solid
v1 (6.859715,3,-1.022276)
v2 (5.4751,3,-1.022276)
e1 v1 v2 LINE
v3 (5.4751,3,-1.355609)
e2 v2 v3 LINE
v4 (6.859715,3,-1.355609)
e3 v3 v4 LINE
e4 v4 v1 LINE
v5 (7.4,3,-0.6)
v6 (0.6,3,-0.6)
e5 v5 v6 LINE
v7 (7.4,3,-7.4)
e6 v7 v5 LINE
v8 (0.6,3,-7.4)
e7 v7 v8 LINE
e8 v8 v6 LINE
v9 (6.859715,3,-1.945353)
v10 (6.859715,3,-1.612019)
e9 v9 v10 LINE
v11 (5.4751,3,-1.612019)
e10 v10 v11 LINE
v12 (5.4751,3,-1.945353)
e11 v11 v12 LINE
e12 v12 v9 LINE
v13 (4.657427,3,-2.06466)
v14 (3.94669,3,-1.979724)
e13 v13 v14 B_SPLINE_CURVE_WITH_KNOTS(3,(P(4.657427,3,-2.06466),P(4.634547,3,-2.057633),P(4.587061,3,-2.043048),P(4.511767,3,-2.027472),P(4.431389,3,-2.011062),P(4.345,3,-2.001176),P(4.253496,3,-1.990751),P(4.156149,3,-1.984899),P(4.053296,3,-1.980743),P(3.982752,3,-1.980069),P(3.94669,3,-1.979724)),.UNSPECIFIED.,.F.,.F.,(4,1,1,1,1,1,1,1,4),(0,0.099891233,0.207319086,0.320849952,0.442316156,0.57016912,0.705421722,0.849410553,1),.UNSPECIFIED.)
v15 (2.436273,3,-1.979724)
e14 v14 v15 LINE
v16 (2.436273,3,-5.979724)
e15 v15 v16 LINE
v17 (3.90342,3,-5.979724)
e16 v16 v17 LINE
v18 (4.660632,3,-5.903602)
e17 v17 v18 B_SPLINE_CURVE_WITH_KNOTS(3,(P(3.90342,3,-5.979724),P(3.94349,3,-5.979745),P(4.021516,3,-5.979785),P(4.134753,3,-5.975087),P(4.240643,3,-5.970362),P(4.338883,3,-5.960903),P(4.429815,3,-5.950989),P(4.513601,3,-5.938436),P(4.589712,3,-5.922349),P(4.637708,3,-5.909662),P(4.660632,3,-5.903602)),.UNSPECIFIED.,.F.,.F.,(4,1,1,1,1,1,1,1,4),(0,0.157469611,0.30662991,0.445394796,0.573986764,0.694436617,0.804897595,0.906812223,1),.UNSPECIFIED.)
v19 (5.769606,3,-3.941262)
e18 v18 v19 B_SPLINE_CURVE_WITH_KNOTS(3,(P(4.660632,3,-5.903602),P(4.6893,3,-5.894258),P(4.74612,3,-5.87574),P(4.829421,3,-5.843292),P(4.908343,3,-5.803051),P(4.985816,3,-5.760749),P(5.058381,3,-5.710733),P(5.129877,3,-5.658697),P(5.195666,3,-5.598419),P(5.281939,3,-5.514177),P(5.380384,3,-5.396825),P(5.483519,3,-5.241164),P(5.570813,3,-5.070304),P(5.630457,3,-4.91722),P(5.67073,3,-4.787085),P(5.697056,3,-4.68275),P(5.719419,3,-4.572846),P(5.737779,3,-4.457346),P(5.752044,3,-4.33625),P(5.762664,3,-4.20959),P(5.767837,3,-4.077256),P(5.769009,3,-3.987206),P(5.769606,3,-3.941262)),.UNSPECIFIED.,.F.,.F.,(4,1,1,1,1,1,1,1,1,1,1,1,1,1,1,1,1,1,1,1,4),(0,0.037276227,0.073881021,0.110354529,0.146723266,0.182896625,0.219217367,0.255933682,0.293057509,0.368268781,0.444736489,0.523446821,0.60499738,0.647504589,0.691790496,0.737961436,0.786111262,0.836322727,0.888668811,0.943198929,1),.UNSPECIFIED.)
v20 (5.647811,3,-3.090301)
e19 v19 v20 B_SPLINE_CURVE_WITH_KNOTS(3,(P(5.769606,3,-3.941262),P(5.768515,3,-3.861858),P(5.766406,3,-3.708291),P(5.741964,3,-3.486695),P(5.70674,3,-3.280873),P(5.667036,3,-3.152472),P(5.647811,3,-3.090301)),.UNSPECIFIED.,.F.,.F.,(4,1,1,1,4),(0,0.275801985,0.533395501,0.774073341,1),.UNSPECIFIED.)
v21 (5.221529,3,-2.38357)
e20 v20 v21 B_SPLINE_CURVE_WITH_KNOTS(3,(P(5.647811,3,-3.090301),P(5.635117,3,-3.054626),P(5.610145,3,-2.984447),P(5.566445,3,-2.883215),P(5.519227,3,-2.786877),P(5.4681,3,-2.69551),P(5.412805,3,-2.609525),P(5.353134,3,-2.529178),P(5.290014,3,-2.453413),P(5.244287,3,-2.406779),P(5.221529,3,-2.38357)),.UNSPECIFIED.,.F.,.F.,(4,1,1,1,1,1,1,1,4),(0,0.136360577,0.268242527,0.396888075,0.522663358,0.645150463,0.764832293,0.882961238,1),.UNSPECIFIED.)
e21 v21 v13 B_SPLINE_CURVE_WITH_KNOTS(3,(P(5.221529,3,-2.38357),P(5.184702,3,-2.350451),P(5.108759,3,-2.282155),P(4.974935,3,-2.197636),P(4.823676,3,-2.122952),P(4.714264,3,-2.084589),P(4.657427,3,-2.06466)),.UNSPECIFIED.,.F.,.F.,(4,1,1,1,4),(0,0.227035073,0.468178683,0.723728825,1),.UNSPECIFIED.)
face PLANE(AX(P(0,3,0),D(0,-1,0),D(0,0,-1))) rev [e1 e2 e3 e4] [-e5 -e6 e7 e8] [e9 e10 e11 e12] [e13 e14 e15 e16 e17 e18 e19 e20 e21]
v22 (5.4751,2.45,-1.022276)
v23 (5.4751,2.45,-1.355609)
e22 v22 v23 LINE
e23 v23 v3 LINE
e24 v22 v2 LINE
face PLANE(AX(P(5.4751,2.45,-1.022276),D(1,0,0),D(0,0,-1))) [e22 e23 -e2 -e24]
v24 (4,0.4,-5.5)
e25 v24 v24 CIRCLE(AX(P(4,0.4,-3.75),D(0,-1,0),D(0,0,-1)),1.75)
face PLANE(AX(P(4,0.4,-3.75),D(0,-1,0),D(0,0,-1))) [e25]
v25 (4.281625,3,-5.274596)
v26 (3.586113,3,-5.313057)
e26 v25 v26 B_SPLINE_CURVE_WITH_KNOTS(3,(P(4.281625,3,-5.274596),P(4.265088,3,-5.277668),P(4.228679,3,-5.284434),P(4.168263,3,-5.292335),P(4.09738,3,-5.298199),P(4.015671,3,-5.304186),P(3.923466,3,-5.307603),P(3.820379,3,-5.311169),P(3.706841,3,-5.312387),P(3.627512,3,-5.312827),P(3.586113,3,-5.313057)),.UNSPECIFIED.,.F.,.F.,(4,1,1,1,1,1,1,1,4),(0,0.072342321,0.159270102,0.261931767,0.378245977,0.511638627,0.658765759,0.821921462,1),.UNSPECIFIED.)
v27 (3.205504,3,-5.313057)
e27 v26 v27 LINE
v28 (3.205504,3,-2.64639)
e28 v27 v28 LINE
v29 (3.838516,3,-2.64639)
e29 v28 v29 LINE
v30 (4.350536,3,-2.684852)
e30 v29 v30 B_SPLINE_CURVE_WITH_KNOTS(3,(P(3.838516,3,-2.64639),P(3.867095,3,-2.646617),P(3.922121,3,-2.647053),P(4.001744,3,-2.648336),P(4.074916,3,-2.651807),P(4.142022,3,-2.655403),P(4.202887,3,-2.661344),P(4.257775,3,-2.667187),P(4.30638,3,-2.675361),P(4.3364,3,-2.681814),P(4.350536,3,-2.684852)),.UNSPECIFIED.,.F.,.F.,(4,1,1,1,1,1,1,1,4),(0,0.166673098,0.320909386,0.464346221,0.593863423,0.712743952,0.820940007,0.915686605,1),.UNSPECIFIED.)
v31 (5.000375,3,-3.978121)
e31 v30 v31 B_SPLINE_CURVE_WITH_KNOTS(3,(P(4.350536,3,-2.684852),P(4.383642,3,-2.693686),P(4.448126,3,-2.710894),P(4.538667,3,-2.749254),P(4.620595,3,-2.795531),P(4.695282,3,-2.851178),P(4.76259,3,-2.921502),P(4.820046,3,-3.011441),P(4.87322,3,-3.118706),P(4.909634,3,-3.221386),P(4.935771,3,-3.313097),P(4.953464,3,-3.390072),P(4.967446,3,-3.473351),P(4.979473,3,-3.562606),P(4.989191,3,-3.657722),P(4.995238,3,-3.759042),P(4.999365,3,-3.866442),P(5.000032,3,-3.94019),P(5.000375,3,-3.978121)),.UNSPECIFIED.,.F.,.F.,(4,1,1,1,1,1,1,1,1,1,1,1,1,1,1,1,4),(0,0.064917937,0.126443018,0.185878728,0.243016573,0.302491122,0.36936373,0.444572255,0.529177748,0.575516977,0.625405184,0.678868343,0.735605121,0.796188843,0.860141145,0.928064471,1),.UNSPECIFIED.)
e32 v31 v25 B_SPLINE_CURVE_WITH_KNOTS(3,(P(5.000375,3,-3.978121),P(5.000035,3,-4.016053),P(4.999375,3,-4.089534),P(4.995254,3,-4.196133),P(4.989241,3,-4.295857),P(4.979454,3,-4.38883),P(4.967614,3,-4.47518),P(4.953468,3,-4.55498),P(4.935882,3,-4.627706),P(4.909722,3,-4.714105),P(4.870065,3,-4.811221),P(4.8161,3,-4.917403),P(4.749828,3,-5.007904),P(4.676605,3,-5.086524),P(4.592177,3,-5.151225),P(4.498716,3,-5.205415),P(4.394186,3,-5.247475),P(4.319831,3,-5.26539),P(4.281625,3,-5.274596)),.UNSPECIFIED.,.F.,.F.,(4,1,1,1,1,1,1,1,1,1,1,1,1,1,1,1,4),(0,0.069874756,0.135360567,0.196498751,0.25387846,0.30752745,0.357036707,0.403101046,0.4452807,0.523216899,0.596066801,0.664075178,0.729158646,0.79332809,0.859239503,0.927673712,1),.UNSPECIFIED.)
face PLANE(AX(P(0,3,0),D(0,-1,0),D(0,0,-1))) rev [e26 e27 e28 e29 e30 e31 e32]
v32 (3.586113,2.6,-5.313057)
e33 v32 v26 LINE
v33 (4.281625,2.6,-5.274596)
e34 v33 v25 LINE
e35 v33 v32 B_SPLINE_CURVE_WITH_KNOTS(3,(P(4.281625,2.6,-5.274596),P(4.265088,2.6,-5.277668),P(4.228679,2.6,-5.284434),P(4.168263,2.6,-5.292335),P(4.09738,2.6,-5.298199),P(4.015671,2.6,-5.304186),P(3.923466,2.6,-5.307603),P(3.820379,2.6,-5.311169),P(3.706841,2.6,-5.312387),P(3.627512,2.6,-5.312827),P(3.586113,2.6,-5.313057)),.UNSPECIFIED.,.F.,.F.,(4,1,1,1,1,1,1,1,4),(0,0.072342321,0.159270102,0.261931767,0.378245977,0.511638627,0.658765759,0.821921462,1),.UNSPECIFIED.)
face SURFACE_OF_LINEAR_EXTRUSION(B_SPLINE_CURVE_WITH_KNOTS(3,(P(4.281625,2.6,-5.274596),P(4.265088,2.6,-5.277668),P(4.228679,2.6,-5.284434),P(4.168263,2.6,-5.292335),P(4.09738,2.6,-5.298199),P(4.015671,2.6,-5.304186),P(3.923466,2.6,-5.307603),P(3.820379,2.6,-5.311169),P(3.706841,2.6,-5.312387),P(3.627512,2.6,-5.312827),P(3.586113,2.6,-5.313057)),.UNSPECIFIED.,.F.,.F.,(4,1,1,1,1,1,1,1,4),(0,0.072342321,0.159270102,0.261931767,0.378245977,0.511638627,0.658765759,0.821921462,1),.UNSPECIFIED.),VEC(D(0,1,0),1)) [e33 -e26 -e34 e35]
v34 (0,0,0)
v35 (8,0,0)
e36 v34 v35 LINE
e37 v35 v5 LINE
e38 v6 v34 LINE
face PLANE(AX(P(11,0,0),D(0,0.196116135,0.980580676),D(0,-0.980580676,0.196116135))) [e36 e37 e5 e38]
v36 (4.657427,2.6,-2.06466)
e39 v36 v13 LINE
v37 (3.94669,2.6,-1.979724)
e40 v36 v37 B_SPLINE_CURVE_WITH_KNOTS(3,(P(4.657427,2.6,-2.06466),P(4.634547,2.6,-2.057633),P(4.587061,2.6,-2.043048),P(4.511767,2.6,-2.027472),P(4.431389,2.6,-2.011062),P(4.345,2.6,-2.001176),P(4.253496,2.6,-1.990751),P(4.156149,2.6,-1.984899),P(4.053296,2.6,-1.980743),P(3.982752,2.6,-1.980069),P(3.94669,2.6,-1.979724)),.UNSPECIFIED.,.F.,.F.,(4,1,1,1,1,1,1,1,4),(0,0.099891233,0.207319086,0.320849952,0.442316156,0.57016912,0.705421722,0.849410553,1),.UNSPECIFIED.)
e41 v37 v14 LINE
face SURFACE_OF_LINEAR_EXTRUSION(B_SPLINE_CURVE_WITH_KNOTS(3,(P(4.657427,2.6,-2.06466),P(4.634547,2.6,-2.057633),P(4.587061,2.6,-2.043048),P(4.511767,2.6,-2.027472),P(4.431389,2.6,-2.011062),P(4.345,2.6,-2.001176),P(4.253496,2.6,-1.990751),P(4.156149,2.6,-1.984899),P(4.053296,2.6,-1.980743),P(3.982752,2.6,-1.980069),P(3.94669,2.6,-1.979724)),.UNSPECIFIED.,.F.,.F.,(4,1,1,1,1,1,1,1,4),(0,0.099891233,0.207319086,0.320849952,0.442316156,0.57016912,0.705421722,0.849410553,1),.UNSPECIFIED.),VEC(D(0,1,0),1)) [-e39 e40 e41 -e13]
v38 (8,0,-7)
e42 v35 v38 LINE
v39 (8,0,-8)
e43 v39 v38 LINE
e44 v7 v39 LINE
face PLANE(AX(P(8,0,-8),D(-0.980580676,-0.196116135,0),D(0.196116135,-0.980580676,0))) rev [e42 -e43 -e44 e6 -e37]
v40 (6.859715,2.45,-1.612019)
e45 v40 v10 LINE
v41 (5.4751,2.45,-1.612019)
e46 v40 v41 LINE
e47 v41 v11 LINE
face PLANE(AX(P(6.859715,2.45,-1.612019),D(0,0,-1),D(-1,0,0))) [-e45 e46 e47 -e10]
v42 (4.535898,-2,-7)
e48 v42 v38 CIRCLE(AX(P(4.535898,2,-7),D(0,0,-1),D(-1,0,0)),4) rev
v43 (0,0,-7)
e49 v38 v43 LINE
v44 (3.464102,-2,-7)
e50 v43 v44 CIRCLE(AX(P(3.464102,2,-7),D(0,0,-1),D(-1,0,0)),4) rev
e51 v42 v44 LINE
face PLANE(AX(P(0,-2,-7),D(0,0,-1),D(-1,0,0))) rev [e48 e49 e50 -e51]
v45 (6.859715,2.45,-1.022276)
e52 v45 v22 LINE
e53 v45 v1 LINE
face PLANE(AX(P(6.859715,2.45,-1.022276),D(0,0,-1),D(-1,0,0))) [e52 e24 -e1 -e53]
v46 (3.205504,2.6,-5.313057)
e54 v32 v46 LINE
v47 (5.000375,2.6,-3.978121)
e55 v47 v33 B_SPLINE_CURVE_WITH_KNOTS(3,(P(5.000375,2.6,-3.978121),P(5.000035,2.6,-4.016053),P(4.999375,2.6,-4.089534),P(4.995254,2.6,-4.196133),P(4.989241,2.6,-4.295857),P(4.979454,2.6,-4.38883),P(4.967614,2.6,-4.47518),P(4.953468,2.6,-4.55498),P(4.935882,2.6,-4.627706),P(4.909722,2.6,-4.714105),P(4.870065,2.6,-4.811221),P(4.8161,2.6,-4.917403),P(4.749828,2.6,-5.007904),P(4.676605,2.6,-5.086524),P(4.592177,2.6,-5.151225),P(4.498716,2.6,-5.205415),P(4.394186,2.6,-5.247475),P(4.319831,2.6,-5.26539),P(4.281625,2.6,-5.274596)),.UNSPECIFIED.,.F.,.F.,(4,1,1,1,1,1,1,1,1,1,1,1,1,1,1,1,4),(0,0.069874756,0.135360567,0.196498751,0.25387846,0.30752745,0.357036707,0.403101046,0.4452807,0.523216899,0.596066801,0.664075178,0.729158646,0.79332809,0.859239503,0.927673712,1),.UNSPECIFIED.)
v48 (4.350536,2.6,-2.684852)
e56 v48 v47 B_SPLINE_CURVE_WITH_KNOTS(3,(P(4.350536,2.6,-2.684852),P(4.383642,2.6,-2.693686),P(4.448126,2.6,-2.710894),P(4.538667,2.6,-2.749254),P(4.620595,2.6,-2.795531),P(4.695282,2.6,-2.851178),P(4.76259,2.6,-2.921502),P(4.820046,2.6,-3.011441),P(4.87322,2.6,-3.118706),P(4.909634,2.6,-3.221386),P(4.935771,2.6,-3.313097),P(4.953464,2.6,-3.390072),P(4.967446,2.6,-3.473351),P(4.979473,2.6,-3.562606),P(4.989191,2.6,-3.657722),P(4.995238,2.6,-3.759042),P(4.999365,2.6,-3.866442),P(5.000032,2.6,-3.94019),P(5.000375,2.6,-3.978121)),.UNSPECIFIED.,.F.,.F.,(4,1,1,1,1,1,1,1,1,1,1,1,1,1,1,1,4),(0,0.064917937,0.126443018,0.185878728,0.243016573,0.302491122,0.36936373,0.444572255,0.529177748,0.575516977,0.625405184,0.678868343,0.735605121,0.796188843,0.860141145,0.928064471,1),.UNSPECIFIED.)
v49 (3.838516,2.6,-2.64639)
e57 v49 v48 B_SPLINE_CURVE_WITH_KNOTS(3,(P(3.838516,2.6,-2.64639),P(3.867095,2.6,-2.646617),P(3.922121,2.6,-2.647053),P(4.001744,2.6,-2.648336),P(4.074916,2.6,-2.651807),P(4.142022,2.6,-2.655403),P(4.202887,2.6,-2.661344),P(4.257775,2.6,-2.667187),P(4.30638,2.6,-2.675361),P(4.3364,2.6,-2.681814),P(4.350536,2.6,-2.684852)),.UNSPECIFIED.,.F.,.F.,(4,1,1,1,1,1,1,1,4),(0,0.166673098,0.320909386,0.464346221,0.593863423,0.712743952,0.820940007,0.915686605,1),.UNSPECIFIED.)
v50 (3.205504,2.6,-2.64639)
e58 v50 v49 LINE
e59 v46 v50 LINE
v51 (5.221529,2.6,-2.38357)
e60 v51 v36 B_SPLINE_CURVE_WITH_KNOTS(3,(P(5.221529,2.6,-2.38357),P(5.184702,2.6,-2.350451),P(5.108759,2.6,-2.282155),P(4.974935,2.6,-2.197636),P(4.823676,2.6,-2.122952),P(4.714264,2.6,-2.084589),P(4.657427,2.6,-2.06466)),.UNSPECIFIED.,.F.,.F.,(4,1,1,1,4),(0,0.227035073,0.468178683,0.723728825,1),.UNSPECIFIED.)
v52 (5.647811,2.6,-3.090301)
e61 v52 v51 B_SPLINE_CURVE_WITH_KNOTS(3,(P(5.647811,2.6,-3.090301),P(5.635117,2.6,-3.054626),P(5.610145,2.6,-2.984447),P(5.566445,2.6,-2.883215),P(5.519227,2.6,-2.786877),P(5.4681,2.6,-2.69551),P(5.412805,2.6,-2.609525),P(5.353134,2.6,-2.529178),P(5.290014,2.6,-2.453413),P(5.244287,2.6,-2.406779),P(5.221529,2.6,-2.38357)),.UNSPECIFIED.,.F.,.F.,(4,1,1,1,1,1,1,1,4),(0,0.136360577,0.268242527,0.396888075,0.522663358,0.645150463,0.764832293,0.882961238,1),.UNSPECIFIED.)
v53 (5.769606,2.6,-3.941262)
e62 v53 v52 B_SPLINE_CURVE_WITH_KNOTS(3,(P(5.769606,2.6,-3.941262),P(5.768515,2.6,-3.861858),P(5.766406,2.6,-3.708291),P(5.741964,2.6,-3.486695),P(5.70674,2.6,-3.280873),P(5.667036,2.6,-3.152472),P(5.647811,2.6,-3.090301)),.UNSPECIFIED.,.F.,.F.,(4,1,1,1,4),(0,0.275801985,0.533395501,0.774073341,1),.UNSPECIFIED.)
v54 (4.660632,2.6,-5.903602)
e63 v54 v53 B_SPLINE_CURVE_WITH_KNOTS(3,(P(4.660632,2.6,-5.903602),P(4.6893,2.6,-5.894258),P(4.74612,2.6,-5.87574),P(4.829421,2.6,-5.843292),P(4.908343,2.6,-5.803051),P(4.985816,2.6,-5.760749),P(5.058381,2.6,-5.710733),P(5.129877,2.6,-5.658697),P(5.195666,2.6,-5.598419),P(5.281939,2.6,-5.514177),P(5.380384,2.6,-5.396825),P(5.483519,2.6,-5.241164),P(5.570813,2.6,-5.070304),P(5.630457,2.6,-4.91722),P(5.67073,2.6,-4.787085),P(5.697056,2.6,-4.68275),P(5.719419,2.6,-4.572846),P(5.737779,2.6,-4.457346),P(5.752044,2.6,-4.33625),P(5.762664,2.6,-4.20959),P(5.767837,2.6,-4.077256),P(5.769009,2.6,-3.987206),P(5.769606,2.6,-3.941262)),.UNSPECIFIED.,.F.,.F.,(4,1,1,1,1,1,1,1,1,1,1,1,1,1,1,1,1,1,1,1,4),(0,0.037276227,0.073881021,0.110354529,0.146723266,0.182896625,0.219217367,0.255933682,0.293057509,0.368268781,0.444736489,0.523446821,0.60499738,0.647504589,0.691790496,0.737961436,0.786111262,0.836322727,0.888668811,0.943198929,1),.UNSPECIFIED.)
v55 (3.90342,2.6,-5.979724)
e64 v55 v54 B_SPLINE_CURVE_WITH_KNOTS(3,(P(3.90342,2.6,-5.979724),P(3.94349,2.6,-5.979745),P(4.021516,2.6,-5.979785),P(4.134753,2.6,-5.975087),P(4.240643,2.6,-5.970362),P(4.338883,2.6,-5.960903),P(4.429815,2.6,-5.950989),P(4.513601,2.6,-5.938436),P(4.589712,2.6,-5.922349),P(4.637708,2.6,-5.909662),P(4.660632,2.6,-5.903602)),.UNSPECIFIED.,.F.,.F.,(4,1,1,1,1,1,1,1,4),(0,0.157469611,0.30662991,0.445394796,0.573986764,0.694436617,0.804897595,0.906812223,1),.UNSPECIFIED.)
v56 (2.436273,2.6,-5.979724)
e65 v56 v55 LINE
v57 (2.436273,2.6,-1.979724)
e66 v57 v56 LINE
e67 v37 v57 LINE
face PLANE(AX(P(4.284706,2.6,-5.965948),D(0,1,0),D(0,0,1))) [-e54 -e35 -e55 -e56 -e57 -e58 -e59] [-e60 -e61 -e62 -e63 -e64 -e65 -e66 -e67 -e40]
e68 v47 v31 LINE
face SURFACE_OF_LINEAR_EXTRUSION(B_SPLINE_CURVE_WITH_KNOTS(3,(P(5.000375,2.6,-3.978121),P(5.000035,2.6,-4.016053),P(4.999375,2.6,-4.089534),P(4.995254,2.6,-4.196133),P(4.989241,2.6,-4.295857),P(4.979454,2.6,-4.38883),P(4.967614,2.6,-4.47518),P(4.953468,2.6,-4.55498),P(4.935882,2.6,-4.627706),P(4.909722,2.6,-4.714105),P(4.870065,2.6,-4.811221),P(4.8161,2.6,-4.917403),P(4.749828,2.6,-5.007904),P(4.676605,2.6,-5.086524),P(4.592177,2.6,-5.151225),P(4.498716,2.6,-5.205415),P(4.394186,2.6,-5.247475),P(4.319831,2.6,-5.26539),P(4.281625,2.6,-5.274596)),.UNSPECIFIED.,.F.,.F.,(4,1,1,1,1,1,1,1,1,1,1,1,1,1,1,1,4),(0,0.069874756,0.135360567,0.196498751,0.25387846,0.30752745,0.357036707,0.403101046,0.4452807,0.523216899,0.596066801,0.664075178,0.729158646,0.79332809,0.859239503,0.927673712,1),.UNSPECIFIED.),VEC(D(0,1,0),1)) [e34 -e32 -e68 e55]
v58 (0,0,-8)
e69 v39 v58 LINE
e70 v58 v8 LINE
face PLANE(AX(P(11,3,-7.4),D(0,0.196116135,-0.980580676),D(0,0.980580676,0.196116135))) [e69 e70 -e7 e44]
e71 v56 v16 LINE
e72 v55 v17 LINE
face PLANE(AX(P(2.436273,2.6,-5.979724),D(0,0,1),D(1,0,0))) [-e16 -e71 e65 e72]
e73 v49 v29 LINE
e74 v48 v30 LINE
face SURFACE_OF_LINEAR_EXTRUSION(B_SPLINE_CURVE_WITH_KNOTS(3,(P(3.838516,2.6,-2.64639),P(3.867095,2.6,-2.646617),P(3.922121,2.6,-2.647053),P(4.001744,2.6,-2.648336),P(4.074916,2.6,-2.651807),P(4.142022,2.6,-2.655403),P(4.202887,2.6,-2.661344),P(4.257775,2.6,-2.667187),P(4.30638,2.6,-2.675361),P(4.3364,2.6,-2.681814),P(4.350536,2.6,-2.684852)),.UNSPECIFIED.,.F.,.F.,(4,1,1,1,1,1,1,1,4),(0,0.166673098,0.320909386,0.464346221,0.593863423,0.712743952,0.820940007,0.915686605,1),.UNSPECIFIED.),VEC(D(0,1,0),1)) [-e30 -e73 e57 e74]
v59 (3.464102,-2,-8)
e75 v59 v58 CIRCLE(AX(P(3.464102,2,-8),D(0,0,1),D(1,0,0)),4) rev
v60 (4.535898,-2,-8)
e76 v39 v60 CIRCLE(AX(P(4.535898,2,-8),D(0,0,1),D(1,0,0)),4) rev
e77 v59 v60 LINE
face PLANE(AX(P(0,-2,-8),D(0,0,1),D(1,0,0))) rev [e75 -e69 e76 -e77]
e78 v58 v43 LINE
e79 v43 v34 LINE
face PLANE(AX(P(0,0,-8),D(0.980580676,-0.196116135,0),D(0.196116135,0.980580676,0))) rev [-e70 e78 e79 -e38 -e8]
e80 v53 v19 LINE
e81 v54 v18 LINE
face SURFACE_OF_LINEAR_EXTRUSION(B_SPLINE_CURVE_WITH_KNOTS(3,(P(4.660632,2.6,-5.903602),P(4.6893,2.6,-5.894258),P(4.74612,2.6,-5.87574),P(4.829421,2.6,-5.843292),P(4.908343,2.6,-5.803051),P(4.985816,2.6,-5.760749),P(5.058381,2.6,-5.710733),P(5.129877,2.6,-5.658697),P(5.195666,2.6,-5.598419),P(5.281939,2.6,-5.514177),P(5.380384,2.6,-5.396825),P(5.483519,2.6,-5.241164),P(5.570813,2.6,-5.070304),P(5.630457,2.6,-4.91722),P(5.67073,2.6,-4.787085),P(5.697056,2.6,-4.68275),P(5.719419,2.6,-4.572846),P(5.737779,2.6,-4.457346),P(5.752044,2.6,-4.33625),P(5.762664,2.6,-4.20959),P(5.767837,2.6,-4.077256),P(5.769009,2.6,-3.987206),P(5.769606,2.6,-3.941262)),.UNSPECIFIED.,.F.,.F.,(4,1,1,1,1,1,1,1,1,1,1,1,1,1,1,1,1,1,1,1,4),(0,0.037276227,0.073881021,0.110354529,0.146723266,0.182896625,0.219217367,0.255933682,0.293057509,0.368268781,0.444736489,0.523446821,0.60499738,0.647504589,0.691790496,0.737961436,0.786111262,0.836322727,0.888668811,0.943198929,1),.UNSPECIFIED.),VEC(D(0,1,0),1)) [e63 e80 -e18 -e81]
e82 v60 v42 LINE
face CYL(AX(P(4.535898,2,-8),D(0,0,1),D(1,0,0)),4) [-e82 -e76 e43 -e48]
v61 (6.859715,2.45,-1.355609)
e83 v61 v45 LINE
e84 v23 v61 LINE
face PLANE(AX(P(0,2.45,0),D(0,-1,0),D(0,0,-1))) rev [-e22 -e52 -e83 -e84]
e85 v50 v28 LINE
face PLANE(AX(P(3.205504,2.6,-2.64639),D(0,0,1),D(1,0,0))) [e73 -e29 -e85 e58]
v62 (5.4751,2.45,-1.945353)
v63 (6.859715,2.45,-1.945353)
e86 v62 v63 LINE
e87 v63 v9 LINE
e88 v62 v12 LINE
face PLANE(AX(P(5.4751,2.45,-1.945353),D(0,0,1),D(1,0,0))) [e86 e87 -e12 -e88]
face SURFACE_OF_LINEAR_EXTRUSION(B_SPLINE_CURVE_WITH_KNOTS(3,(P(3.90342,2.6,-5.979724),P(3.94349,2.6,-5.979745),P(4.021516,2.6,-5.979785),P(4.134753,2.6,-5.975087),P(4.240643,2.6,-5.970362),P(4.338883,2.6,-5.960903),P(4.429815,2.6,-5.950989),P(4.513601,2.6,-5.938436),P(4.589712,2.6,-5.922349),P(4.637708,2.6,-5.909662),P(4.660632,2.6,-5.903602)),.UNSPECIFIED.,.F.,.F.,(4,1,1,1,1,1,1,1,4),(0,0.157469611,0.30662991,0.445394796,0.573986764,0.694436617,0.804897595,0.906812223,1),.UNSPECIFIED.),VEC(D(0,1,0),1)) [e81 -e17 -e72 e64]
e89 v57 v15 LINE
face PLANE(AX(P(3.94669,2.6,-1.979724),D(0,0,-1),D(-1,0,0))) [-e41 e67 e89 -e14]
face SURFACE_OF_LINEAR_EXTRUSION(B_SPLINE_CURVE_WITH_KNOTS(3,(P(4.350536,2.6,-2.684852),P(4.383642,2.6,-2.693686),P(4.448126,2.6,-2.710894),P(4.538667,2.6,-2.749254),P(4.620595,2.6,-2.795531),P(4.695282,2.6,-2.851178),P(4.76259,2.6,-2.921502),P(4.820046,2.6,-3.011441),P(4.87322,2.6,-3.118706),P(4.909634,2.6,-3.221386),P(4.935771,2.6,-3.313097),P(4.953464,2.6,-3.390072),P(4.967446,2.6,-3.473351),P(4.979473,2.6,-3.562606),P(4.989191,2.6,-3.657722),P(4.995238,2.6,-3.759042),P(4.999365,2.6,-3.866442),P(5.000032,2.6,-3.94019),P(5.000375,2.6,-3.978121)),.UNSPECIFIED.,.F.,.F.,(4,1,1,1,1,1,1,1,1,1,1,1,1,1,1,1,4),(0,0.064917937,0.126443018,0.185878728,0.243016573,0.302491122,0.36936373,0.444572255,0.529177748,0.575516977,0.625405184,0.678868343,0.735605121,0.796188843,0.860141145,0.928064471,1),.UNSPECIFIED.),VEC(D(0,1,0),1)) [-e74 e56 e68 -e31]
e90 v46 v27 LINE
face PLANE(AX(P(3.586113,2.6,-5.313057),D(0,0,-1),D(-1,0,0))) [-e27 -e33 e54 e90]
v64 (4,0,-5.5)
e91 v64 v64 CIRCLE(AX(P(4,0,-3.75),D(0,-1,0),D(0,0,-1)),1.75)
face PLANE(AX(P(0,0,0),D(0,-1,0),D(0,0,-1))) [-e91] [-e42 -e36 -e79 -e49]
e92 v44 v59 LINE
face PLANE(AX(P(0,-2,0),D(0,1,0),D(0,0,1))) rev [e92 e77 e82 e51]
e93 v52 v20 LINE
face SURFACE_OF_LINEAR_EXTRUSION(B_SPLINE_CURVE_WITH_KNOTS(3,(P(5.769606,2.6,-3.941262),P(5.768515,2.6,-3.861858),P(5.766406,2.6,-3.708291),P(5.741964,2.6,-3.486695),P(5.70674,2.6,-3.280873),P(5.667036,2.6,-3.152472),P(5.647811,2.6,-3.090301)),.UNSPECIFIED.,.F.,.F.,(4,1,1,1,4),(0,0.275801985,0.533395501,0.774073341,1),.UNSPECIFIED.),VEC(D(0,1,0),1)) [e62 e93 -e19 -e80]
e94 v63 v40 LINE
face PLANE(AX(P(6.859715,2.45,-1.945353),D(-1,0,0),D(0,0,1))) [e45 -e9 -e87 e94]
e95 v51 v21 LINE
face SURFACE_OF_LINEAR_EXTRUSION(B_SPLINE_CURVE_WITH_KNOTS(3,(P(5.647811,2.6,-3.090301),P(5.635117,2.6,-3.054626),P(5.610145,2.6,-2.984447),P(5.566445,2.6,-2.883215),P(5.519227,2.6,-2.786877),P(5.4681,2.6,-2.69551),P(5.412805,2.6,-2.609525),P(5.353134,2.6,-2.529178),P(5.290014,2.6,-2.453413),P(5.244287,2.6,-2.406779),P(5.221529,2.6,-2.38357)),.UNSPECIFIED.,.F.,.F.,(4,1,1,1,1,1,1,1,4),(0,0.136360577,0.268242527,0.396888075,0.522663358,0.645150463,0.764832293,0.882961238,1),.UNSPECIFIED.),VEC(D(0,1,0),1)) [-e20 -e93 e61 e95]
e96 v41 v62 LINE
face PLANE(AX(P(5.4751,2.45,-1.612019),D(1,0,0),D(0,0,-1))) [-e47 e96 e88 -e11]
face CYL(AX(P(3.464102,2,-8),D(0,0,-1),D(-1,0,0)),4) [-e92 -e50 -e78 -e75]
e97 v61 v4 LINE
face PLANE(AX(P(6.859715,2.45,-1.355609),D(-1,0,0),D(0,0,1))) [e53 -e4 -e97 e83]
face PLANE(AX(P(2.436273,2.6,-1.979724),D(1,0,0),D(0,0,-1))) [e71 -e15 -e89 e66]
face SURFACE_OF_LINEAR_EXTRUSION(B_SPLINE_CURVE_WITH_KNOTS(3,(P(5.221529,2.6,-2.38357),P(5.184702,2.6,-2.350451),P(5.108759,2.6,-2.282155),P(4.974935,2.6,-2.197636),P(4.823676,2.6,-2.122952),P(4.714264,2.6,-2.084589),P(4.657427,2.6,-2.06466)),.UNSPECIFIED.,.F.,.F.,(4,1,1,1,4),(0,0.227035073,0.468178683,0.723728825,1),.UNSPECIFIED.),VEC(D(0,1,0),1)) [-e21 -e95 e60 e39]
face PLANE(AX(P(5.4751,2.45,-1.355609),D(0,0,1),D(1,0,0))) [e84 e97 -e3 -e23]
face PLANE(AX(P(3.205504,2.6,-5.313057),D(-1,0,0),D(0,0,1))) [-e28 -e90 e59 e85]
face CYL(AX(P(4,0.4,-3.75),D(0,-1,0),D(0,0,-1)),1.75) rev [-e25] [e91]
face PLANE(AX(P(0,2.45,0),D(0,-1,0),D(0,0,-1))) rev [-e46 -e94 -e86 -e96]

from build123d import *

# Parameters (mm, degrees)
SKETCH1_W               = 8
SKETCH1_H               = 8
BOSS_EXTRUDE1_DEPTH     = 3
CUT_EXTRUDE1_DEPTH      = 12.704699911
CUT_EXTRUDE1_DEPTH_BACK = 12.704699911
CUT_EXTRUDE2_DEPTH      = 11
SKETCH4_R               = 1.75
CUT_EXTRUDE3_DEPTH      = 0.4
SKETCH5_W               = 8
SKETCH5_H               = 1
BOSS_EXTRUDE2_DEPTH     = 2
FILLET1_R               = 4
CUT_EXTRUDE4_DEPTH      = 0.4
SKETCH7_W               = 1.384615385
SKETCH7_H               = 0.333333334
CUT_EXTRUDE5_DEPTH      = 0.55


with BuildPart() as part:
    # Sketch1 → Boss-Extrude1 (new body)
    with BuildSketch(Plane(origin=(0, 0, 0), x_dir=(1, 0, 0), z_dir=(0, 1, 0))):
        with Locations((4, 4)):
            Rectangle(SKETCH1_W, SKETCH1_H)
    extrude(amount=BOSS_EXTRUDE1_DEPTH)

    # Sketch2 → Cut-Extrude1 (cut, two sides: drawn at the far end of the back side and taken through both)
    with BuildSketch(Plane.XY.offset(-CUT_EXTRUDE1_DEPTH_BACK)):
        Polygon((0, 0), (0.6, 3), (0, 3), align=None)
        Polygon((8, 0), (7.4, 3), (8, 3), align=None)
    extrude(amount=CUT_EXTRUDE1_DEPTH + CUT_EXTRUDE1_DEPTH_BACK, mode=Mode.SUBTRACT)

    # Sketch3 → Cut-Extrude2 (cut)
    with BuildSketch(Plane(origin=(0, 0, 0), x_dir=(0, 0, -1), z_dir=(1, 0, 0))):
        Polygon((0, 0), (0.6, 3), (0, 3), align=None)
        Polygon((8, 3), (7.4, 3), (8, 0), align=None)
    extrude(amount=CUT_EXTRUDE2_DEPTH, mode=Mode.SUBTRACT)

    # Sketch4 → Cut-Extrude3 (cut)
    with BuildSketch(Plane.XZ):
        with Locations(Location((4, -3.75, 0), (0, 0, 270))):
            Circle(SKETCH4_R)
    extrude(amount=-CUT_EXTRUDE3_DEPTH, mode=Mode.SUBTRACT)

    # Sketch5 → Boss-Extrude2 (add)
    with BuildSketch(Plane.XZ):
        with Locations((4, -7.5)):
            Rectangle(SKETCH5_W, SKETCH5_H)
    extrude(amount=BOSS_EXTRUDE2_DEPTH)

    # Fillet1
    # the kernel refuses this fillet: 4 mm, written as the material it takes off along each edge
    with BuildSketch(Plane(origin=(8, -2, -16.660254038), x_dir=(0, 1, 0), z_dir=(0, 0, 1)), Plane(origin=(0, -2, 1.660254038), x_dir=(0, 1, 0), z_dir=(0, 0, -1))) as fillet1_piece_1:
        with BuildLine():
            CenterArc((4, 3.464101615), FILLET1_R, 180, 60)
            Line((0, 3.464101615), (-0.08, 3.464101615))
            Line((-0.08, 3.464101615), (-0.08, 0))
            Line((-0.08, 0), (0, -0.08))
            ThreePointArc((0, -0.08), (1, -0.08), (1.96, -0.069282032))
            Line((1.96, -0.069282032), (2, 0))
        make_face()
    extrude(amount=18.320508076, mode=Mode.SUBTRACT)

    # Sketch6 → Cut-Extrude4 (cut)
    with BuildSketch(Plane(origin=(0, 3, 0), x_dir=(1, 0, 0), z_dir=(0, 1, 0))):
        with BuildLine():
            Line((2.436272881, 5.979723732), (3.903420317, 5.979723732))
            add(Edge.make_bspline(
                [(3.903420317, 5.979723732), (3.943490496, 5.979744505), (4.021516441, 5.979784954), (4.134752515, 5.975087302), (4.240642802, 5.970362082), (4.338883372, 5.960903224), (4.429815049, 5.950988663), (4.51360101, 5.938436084), (4.589711972, 5.922348579), (4.637707501, 5.909661658), (4.660631856, 5.903601937)],
                knots=[0, 0, 0, 0, 1.259756885, 2.453039283, 3.563158368, 4.591894114, 5.55549294, 6.43918076, 7.254497783, 8, 8, 8, 8], degree=3))
            add(Edge.make_bspline(
                [(4.660631856, 5.903601937), (4.689300162, 5.894258489), (4.74612039, 5.87573989), (4.829420592, 5.843292221), (4.908343197, 5.803050568), (4.985816138, 5.760749105), (5.058380803, 5.710732544), (5.129877456, 5.658697008), (5.195666079, 5.598419283), (5.281939397, 5.514177193), (5.380383811, 5.396825298), (5.483519335, 5.241163905), (5.570813292, 5.070304112), (5.630456537, 4.917219685), (5.670729972, 4.787084992), (5.697056277, 4.682749965), (5.719418871, 4.572846322), (5.737778631, 4.457346355), (5.752043635, 4.336250048), (5.762664083, 4.209589679), (5.767837312, 4.07725583), (5.769008616, 3.987205692), (5.769606215, 3.941262194)],
                knots=[0, 0, 0, 0, 0.745524535, 1.477620414, 2.207090574, 2.934465325, 3.657932502, 4.384347339, 5.118673636, 5.861150177, 7.365375624, 8.894729774, 10.468936425, 12.099947606, 12.950091786, 13.83580991, 14.759228729, 15.722225242, 16.726454549, 17.773376212, 18.863978586, 20, 20, 20, 20], degree=3))
            add(Edge.make_bspline(
                [(5.769606215, 3.941262194), (5.768515323, 3.861857727), (5.766405561, 3.708291084), (5.741963835, 3.486695058), (5.70674022, 3.280872561), (5.667035899, 3.152471539), (5.647811343, 3.090300655)],
                knots=[0, 0, 0, 0, 1.103207939, 2.133582005, 3.096293362, 4, 4, 4, 4], degree=3))
            add(Edge.make_bspline(
                [(5.647811343, 3.090300655), (5.635116766, 3.054625647), (5.610144552, 2.98444734), (5.566445051, 2.883214788), (5.519227431, 2.786877042), (5.468100041, 2.695510004), (5.412804571, 2.609524646), (5.353134197, 2.529178156), (5.290013855, 2.453412746), (5.244286819, 2.406778778), (5.221529292, 2.383569886)],
                knots=[0, 0, 0, 0, 1.090884612, 2.145940218, 3.175104604, 4.181306866, 5.161203701, 6.118658341, 7.063689906, 8, 8, 8, 8], degree=3))
            add(Edge.make_bspline(
                [(5.221529292, 2.383569886), (5.184702113, 2.350450915), (5.108759222, 2.282154876), (4.974934842, 2.197635799), (4.823675662, 2.122952418), (4.714264019, 2.084588805), (4.657426727, 2.06465963)],
                knots=[0, 0, 0, 0, 0.908140292, 1.872714733, 2.8949153, 4, 4, 4, 4], degree=3))
            add(Edge.make_bspline(
                [(4.657426727, 2.06465963), (4.634546833, 2.057632533), (4.587060796, 2.043048157), (4.511767003, 2.027471741), (4.431388989, 2.011061834), (4.344999886, 2.001176252), (4.253496453, 1.990751469), (4.156149493, 1.984898536), (4.053296456, 1.980743294), (3.98275208, 1.980068625), (3.946689548, 1.979723732)],
                knots=[0, 0, 0, 0, 0.799129865, 1.658552685, 2.566799617, 3.538529252, 4.561352959, 5.643373779, 6.795284424, 8, 8, 8, 8], degree=3))
            Line((3.946689548, 1.979723732), (2.436272881, 1.979723732))
            Line((2.436272881, 1.979723732), (2.436272881, 5.979723732))
        make_face()
        with BuildLine():
            Line((3.205503651, 5.313057065), (3.205503651, 2.646390399))
            Line((3.205503651, 2.646390399), (3.838516471, 2.646390399))
            add(Edge.make_bspline(
                [(3.838516471, 2.646390399), (3.86709534, 2.646617049), (3.922120581, 2.647053436), (4.001743514, 2.648335709), (4.07491632, 2.651807064), (4.142022322, 2.655402822), (4.202886818, 2.661343643), (4.257774639, 2.667186667), (4.306380252, 2.675360935), (4.336400272, 2.681813595), (4.350535702, 2.684851937)],
                knots=[0, 0, 0, 0, 1.333384787, 2.567275092, 3.714769766, 4.750907381, 5.701951617, 6.567520054, 7.325492842, 8, 8, 8, 8], degree=3))
            add(Edge.make_bspline(
                [(4.350535702, 2.684851937), (4.38364248, 2.693686468), (4.44812575, 2.710893803), (4.538666782, 2.749253907), (4.62059475, 2.795531175), (4.695281698, 2.8511776), (4.762590099, 2.92150181), (4.820046047, 3.011440962), (4.873220012, 3.118706088), (4.909633556, 3.221385639), (4.935771128, 3.313096613), (4.95346412, 3.390071897), (4.967446413, 3.47335137), (4.979473009, 3.562606359), (4.989190784, 3.657722085), (4.995237644, 3.759042029), (4.999364663, 3.866442163), (5.000032135, 3.940189623), (5.000375445, 3.978121168)],
                knots=[0, 0, 0, 0, 1.038686998, 2.023088296, 2.974059649, 3.888265163, 4.839857954, 5.909819677, 7.113156087, 8.466843969, 9.20827164, 10.006482943, 10.861893492, 11.769681931, 12.739021491, 13.762258324, 14.849031541, 16, 16, 16, 16], degree=3))
            add(Edge.make_bspline(
                [(5.000375445, 3.978121168), (5.000034775, 4.01605283), (4.999374834, 4.089533605), (4.995254144, 4.196132914), (4.989241251, 4.29585735), (4.979454269, 4.38883019), (4.967614104, 4.475179926), (4.953468032, 4.554979633), (4.935881696, 4.627705609), (4.909721893, 4.71410541), (4.870064977, 4.811221472), (4.816099655, 4.917402921), (4.749828382, 5.00790436), (4.676605078, 5.08652444), (4.592177372, 5.151224792), (4.498716105, 5.205415106), (4.394186359, 5.247475499), (4.319831067, 5.2653904), (4.281625445, 5.274595527)],
                knots=[0, 0, 0, 0, 1.117996097, 2.165769068, 3.143980016, 4.062055362, 4.920439205, 5.712587309, 6.449616741, 7.124491204, 8.371470382, 9.537068822, 10.625202851, 11.666538334, 12.693249444, 13.747832046, 14.842779399, 16, 16, 16, 16], degree=3))
            add(Edge.make_bspline(
                [(4.281625445, 5.274595527), (4.265088191, 5.27766838), (4.228679487, 5.284433627), (4.168262747, 5.292335475), (4.097380449, 5.298199321), (4.015671249, 5.304185793), (3.923465993, 5.307602683), (3.820378875, 5.311168762), (3.706841263, 5.312386928), (3.627511913, 5.312827267), (3.586112625, 5.313057065)],
                knots=[0, 0, 0, 0, 0.578738571, 1.274160813, 2.095454135, 3.025967819, 4.093109015, 5.270126069, 6.575371698, 8, 8, 8, 8], degree=3))
            Line((3.586112625, 5.313057065), (3.205503651, 5.313057065))
        make_face(mode=Mode.SUBTRACT)
    extrude(amount=-CUT_EXTRUDE4_DEPTH, mode=Mode.SUBTRACT)

    # Sketch7 → Cut-Extrude5 (cut)
    with BuildSketch(Plane(origin=(0, 3, 0), x_dir=(1, 0, 0), z_dir=(0, 1, 0))):
        with Locations((6.167407218, 1.778686134)):
            Rectangle(SKETCH7_W, SKETCH7_H)
        with Locations((6.167407218, 1.188942544)):
            Rectangle(SKETCH7_W, SKETCH7_H)
    extrude(amount=-CUT_EXTRUDE5_DEPTH, mode=Mode.SUBTRACT)


solid = part.part
